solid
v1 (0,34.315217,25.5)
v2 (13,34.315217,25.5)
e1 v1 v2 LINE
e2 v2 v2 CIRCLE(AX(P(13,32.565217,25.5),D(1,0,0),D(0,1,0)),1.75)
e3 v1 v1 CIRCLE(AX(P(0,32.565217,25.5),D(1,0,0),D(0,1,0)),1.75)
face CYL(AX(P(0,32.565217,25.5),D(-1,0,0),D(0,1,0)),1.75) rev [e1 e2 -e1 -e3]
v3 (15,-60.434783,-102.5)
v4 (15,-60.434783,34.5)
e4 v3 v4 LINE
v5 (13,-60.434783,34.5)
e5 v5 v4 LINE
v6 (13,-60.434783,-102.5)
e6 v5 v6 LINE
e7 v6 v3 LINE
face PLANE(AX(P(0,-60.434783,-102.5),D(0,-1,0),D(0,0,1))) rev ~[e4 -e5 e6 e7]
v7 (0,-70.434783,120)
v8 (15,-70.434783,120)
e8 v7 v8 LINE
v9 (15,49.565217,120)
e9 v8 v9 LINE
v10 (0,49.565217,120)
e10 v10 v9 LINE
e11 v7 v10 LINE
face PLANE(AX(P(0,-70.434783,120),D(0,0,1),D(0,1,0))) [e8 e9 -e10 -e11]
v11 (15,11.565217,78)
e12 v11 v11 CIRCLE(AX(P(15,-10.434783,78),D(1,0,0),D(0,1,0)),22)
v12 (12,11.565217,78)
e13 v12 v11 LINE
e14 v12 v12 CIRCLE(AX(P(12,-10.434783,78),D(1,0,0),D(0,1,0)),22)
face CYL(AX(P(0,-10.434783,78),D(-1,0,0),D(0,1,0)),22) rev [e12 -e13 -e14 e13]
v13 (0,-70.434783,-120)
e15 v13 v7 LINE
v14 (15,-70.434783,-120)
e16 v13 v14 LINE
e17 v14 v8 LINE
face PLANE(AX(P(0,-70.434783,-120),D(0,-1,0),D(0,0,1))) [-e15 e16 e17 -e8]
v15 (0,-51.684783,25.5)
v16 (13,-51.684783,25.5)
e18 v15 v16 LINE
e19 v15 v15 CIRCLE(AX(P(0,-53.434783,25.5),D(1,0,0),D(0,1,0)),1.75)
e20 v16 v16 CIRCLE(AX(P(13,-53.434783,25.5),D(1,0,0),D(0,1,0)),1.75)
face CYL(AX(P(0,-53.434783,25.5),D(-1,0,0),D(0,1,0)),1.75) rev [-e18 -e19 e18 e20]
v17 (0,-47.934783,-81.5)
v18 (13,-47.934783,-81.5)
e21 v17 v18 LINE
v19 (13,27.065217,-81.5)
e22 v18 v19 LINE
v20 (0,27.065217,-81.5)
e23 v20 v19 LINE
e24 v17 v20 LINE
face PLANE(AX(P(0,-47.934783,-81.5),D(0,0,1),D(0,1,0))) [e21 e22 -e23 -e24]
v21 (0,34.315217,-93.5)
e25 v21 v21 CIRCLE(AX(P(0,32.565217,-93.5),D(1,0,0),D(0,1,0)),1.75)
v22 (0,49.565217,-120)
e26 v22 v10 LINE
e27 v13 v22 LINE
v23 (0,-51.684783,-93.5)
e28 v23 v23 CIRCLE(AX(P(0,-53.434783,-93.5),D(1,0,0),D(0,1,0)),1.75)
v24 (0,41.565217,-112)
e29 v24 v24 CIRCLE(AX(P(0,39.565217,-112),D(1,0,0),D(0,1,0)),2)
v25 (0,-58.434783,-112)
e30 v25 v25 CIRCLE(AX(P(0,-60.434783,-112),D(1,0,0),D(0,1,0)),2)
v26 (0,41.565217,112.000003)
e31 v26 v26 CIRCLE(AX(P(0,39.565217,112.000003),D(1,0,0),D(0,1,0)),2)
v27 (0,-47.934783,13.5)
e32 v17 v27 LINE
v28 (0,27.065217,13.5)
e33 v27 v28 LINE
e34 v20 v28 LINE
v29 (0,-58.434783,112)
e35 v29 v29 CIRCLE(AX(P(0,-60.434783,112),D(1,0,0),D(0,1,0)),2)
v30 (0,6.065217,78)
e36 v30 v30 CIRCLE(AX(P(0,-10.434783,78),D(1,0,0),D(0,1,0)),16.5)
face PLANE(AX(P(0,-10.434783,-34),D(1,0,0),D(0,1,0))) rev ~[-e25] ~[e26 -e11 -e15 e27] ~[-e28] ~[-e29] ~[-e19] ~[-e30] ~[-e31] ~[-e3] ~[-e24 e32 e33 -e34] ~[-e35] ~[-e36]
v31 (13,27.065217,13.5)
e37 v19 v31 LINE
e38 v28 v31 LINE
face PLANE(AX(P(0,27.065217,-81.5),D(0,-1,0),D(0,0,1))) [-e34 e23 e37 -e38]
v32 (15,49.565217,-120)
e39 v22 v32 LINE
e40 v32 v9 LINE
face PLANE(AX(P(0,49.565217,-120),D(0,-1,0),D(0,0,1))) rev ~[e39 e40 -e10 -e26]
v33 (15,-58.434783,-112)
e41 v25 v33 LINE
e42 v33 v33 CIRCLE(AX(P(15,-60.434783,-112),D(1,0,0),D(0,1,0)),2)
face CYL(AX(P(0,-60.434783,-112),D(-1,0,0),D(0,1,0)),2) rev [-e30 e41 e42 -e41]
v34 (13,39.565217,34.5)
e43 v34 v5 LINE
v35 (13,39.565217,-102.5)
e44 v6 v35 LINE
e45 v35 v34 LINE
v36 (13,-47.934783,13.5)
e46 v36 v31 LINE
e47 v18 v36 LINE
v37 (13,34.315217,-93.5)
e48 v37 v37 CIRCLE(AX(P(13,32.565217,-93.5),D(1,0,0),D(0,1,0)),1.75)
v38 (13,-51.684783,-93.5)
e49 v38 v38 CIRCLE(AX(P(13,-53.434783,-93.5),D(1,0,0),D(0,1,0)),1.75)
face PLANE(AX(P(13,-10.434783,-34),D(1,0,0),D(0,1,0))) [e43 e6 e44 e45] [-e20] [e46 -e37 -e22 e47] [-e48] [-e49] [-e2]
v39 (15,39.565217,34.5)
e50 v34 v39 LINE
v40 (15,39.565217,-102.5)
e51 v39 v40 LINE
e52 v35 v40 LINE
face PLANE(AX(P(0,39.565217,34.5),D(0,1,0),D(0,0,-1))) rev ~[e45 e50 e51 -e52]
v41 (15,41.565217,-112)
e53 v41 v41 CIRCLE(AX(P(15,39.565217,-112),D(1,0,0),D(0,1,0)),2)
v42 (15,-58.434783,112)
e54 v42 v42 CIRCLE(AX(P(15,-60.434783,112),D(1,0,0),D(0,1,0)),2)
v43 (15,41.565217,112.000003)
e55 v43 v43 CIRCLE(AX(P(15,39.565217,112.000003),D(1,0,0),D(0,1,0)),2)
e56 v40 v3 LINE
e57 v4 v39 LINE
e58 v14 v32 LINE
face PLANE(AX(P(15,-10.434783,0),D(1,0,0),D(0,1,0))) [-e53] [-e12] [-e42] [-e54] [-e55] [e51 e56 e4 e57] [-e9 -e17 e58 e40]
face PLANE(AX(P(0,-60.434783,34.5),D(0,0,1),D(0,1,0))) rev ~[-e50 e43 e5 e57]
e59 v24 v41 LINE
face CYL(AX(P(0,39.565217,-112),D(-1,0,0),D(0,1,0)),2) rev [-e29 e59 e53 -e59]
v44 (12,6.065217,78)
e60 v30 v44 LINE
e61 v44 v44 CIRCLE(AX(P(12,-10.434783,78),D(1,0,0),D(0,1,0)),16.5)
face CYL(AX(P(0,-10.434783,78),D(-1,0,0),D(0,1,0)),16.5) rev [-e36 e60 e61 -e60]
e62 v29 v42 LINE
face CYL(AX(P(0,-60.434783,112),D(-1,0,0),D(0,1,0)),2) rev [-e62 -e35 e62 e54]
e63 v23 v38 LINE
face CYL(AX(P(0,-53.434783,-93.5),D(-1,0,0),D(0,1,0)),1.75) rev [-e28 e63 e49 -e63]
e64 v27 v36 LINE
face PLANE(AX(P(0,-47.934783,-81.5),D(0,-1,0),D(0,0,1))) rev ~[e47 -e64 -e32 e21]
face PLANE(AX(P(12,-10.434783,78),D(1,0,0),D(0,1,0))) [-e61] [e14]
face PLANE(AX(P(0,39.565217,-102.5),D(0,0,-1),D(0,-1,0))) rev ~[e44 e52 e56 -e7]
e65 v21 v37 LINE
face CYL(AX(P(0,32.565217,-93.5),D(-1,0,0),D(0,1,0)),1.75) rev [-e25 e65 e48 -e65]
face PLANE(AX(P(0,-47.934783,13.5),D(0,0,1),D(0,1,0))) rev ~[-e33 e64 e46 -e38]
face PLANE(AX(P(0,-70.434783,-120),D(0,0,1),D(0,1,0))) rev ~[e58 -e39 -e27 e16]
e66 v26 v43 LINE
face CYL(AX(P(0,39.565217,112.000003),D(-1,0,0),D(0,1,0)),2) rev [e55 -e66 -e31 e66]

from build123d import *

# Parameters (mm, degrees)
F0_W     = 120
F0_H     = 240
F0_R     = 2
F0_R_2   = 22
F1_DEPTH = 15
F0_R_3   = 16.5
F2_DEPTH = 12
F0_R_4   = 1.75
F0_W_2   = 75
F0_H_2   = 95
F3_DEPTH = 13


# Not quite as in the source:
# - a feature names something its author has since deleted; it is built from what else it names


with BuildPart() as f1:
    # F0 (on Right) → F1 (new body)
    with BuildSketch(Plane.YZ):
        with Locations((-10.4347826087, 0)):
            Rectangle(F0_W, F0_H)
        with Locations((-60.4347826087, -112)):
            Circle(F0_R, mode=Mode.SUBTRACT)
        with Locations((39.5652173913, -112)):
            Circle(F0_R, mode=Mode.SUBTRACT)
        Polygon((-60.4347826087, -102.5), (-60.4347826087, 25.4482906163), (-60.4347826087, 34.5), (39.5652173913, 34.5), (39.5652173913, 25.4482906163), (39.5652173913, -102.5), align=None, mode=Mode.SUBTRACT)
        with Locations((-60.4347826087, 112)):
            Circle(F0_R, mode=Mode.SUBTRACT)
        with Locations((-10.4347826087, 78)):
            Circle(F0_R_2, mode=Mode.SUBTRACT)
        with Locations((39.5652173913, 112.0000034571)):
            Circle(F0_R, mode=Mode.SUBTRACT)
    extrude(amount=F1_DEPTH)

    # F0 (on Right) → F2 (join)
    with BuildSketch(Plane.YZ):
        with Locations((-10.4347826087, 78)):
            Circle(F0_R_2)
        with Locations((-10.4347826087, 78)):
            Circle(F0_R_3, mode=Mode.SUBTRACT)
    extrude(amount=F2_DEPTH)

    # F0 (on Right) → F3 (join)
    with BuildSketch(Plane.YZ):
        Polygon((-60.4347826087, 34.5), (-60.4347826087, 25.4482906163), (-60.4347826087, -102.5), (39.5652173913, -102.5), (39.5652173913, 25.4482906163), (39.5652173913, 34.5), align=None)
        with Locations((-53.4347826087, -93.5)):
            Circle(F0_R_4, mode=Mode.SUBTRACT)
        with Locations((32.5652173913, -93.5)):
            Circle(F0_R_4, mode=Mode.SUBTRACT)
        with Locations((-10.4347826087, -34)):
            Rectangle(F0_W_2, F0_H_2, mode=Mode.SUBTRACT)
        with Locations((-53.4347826087, 25.5)):
            Circle(F0_R_4, mode=Mode.SUBTRACT)
        with Locations((32.5652173913, 25.5)):
            Circle(F0_R_4, mode=Mode.SUBTRACT)
    extrude(amount=F3_DEPTH)


solid = f1.part
